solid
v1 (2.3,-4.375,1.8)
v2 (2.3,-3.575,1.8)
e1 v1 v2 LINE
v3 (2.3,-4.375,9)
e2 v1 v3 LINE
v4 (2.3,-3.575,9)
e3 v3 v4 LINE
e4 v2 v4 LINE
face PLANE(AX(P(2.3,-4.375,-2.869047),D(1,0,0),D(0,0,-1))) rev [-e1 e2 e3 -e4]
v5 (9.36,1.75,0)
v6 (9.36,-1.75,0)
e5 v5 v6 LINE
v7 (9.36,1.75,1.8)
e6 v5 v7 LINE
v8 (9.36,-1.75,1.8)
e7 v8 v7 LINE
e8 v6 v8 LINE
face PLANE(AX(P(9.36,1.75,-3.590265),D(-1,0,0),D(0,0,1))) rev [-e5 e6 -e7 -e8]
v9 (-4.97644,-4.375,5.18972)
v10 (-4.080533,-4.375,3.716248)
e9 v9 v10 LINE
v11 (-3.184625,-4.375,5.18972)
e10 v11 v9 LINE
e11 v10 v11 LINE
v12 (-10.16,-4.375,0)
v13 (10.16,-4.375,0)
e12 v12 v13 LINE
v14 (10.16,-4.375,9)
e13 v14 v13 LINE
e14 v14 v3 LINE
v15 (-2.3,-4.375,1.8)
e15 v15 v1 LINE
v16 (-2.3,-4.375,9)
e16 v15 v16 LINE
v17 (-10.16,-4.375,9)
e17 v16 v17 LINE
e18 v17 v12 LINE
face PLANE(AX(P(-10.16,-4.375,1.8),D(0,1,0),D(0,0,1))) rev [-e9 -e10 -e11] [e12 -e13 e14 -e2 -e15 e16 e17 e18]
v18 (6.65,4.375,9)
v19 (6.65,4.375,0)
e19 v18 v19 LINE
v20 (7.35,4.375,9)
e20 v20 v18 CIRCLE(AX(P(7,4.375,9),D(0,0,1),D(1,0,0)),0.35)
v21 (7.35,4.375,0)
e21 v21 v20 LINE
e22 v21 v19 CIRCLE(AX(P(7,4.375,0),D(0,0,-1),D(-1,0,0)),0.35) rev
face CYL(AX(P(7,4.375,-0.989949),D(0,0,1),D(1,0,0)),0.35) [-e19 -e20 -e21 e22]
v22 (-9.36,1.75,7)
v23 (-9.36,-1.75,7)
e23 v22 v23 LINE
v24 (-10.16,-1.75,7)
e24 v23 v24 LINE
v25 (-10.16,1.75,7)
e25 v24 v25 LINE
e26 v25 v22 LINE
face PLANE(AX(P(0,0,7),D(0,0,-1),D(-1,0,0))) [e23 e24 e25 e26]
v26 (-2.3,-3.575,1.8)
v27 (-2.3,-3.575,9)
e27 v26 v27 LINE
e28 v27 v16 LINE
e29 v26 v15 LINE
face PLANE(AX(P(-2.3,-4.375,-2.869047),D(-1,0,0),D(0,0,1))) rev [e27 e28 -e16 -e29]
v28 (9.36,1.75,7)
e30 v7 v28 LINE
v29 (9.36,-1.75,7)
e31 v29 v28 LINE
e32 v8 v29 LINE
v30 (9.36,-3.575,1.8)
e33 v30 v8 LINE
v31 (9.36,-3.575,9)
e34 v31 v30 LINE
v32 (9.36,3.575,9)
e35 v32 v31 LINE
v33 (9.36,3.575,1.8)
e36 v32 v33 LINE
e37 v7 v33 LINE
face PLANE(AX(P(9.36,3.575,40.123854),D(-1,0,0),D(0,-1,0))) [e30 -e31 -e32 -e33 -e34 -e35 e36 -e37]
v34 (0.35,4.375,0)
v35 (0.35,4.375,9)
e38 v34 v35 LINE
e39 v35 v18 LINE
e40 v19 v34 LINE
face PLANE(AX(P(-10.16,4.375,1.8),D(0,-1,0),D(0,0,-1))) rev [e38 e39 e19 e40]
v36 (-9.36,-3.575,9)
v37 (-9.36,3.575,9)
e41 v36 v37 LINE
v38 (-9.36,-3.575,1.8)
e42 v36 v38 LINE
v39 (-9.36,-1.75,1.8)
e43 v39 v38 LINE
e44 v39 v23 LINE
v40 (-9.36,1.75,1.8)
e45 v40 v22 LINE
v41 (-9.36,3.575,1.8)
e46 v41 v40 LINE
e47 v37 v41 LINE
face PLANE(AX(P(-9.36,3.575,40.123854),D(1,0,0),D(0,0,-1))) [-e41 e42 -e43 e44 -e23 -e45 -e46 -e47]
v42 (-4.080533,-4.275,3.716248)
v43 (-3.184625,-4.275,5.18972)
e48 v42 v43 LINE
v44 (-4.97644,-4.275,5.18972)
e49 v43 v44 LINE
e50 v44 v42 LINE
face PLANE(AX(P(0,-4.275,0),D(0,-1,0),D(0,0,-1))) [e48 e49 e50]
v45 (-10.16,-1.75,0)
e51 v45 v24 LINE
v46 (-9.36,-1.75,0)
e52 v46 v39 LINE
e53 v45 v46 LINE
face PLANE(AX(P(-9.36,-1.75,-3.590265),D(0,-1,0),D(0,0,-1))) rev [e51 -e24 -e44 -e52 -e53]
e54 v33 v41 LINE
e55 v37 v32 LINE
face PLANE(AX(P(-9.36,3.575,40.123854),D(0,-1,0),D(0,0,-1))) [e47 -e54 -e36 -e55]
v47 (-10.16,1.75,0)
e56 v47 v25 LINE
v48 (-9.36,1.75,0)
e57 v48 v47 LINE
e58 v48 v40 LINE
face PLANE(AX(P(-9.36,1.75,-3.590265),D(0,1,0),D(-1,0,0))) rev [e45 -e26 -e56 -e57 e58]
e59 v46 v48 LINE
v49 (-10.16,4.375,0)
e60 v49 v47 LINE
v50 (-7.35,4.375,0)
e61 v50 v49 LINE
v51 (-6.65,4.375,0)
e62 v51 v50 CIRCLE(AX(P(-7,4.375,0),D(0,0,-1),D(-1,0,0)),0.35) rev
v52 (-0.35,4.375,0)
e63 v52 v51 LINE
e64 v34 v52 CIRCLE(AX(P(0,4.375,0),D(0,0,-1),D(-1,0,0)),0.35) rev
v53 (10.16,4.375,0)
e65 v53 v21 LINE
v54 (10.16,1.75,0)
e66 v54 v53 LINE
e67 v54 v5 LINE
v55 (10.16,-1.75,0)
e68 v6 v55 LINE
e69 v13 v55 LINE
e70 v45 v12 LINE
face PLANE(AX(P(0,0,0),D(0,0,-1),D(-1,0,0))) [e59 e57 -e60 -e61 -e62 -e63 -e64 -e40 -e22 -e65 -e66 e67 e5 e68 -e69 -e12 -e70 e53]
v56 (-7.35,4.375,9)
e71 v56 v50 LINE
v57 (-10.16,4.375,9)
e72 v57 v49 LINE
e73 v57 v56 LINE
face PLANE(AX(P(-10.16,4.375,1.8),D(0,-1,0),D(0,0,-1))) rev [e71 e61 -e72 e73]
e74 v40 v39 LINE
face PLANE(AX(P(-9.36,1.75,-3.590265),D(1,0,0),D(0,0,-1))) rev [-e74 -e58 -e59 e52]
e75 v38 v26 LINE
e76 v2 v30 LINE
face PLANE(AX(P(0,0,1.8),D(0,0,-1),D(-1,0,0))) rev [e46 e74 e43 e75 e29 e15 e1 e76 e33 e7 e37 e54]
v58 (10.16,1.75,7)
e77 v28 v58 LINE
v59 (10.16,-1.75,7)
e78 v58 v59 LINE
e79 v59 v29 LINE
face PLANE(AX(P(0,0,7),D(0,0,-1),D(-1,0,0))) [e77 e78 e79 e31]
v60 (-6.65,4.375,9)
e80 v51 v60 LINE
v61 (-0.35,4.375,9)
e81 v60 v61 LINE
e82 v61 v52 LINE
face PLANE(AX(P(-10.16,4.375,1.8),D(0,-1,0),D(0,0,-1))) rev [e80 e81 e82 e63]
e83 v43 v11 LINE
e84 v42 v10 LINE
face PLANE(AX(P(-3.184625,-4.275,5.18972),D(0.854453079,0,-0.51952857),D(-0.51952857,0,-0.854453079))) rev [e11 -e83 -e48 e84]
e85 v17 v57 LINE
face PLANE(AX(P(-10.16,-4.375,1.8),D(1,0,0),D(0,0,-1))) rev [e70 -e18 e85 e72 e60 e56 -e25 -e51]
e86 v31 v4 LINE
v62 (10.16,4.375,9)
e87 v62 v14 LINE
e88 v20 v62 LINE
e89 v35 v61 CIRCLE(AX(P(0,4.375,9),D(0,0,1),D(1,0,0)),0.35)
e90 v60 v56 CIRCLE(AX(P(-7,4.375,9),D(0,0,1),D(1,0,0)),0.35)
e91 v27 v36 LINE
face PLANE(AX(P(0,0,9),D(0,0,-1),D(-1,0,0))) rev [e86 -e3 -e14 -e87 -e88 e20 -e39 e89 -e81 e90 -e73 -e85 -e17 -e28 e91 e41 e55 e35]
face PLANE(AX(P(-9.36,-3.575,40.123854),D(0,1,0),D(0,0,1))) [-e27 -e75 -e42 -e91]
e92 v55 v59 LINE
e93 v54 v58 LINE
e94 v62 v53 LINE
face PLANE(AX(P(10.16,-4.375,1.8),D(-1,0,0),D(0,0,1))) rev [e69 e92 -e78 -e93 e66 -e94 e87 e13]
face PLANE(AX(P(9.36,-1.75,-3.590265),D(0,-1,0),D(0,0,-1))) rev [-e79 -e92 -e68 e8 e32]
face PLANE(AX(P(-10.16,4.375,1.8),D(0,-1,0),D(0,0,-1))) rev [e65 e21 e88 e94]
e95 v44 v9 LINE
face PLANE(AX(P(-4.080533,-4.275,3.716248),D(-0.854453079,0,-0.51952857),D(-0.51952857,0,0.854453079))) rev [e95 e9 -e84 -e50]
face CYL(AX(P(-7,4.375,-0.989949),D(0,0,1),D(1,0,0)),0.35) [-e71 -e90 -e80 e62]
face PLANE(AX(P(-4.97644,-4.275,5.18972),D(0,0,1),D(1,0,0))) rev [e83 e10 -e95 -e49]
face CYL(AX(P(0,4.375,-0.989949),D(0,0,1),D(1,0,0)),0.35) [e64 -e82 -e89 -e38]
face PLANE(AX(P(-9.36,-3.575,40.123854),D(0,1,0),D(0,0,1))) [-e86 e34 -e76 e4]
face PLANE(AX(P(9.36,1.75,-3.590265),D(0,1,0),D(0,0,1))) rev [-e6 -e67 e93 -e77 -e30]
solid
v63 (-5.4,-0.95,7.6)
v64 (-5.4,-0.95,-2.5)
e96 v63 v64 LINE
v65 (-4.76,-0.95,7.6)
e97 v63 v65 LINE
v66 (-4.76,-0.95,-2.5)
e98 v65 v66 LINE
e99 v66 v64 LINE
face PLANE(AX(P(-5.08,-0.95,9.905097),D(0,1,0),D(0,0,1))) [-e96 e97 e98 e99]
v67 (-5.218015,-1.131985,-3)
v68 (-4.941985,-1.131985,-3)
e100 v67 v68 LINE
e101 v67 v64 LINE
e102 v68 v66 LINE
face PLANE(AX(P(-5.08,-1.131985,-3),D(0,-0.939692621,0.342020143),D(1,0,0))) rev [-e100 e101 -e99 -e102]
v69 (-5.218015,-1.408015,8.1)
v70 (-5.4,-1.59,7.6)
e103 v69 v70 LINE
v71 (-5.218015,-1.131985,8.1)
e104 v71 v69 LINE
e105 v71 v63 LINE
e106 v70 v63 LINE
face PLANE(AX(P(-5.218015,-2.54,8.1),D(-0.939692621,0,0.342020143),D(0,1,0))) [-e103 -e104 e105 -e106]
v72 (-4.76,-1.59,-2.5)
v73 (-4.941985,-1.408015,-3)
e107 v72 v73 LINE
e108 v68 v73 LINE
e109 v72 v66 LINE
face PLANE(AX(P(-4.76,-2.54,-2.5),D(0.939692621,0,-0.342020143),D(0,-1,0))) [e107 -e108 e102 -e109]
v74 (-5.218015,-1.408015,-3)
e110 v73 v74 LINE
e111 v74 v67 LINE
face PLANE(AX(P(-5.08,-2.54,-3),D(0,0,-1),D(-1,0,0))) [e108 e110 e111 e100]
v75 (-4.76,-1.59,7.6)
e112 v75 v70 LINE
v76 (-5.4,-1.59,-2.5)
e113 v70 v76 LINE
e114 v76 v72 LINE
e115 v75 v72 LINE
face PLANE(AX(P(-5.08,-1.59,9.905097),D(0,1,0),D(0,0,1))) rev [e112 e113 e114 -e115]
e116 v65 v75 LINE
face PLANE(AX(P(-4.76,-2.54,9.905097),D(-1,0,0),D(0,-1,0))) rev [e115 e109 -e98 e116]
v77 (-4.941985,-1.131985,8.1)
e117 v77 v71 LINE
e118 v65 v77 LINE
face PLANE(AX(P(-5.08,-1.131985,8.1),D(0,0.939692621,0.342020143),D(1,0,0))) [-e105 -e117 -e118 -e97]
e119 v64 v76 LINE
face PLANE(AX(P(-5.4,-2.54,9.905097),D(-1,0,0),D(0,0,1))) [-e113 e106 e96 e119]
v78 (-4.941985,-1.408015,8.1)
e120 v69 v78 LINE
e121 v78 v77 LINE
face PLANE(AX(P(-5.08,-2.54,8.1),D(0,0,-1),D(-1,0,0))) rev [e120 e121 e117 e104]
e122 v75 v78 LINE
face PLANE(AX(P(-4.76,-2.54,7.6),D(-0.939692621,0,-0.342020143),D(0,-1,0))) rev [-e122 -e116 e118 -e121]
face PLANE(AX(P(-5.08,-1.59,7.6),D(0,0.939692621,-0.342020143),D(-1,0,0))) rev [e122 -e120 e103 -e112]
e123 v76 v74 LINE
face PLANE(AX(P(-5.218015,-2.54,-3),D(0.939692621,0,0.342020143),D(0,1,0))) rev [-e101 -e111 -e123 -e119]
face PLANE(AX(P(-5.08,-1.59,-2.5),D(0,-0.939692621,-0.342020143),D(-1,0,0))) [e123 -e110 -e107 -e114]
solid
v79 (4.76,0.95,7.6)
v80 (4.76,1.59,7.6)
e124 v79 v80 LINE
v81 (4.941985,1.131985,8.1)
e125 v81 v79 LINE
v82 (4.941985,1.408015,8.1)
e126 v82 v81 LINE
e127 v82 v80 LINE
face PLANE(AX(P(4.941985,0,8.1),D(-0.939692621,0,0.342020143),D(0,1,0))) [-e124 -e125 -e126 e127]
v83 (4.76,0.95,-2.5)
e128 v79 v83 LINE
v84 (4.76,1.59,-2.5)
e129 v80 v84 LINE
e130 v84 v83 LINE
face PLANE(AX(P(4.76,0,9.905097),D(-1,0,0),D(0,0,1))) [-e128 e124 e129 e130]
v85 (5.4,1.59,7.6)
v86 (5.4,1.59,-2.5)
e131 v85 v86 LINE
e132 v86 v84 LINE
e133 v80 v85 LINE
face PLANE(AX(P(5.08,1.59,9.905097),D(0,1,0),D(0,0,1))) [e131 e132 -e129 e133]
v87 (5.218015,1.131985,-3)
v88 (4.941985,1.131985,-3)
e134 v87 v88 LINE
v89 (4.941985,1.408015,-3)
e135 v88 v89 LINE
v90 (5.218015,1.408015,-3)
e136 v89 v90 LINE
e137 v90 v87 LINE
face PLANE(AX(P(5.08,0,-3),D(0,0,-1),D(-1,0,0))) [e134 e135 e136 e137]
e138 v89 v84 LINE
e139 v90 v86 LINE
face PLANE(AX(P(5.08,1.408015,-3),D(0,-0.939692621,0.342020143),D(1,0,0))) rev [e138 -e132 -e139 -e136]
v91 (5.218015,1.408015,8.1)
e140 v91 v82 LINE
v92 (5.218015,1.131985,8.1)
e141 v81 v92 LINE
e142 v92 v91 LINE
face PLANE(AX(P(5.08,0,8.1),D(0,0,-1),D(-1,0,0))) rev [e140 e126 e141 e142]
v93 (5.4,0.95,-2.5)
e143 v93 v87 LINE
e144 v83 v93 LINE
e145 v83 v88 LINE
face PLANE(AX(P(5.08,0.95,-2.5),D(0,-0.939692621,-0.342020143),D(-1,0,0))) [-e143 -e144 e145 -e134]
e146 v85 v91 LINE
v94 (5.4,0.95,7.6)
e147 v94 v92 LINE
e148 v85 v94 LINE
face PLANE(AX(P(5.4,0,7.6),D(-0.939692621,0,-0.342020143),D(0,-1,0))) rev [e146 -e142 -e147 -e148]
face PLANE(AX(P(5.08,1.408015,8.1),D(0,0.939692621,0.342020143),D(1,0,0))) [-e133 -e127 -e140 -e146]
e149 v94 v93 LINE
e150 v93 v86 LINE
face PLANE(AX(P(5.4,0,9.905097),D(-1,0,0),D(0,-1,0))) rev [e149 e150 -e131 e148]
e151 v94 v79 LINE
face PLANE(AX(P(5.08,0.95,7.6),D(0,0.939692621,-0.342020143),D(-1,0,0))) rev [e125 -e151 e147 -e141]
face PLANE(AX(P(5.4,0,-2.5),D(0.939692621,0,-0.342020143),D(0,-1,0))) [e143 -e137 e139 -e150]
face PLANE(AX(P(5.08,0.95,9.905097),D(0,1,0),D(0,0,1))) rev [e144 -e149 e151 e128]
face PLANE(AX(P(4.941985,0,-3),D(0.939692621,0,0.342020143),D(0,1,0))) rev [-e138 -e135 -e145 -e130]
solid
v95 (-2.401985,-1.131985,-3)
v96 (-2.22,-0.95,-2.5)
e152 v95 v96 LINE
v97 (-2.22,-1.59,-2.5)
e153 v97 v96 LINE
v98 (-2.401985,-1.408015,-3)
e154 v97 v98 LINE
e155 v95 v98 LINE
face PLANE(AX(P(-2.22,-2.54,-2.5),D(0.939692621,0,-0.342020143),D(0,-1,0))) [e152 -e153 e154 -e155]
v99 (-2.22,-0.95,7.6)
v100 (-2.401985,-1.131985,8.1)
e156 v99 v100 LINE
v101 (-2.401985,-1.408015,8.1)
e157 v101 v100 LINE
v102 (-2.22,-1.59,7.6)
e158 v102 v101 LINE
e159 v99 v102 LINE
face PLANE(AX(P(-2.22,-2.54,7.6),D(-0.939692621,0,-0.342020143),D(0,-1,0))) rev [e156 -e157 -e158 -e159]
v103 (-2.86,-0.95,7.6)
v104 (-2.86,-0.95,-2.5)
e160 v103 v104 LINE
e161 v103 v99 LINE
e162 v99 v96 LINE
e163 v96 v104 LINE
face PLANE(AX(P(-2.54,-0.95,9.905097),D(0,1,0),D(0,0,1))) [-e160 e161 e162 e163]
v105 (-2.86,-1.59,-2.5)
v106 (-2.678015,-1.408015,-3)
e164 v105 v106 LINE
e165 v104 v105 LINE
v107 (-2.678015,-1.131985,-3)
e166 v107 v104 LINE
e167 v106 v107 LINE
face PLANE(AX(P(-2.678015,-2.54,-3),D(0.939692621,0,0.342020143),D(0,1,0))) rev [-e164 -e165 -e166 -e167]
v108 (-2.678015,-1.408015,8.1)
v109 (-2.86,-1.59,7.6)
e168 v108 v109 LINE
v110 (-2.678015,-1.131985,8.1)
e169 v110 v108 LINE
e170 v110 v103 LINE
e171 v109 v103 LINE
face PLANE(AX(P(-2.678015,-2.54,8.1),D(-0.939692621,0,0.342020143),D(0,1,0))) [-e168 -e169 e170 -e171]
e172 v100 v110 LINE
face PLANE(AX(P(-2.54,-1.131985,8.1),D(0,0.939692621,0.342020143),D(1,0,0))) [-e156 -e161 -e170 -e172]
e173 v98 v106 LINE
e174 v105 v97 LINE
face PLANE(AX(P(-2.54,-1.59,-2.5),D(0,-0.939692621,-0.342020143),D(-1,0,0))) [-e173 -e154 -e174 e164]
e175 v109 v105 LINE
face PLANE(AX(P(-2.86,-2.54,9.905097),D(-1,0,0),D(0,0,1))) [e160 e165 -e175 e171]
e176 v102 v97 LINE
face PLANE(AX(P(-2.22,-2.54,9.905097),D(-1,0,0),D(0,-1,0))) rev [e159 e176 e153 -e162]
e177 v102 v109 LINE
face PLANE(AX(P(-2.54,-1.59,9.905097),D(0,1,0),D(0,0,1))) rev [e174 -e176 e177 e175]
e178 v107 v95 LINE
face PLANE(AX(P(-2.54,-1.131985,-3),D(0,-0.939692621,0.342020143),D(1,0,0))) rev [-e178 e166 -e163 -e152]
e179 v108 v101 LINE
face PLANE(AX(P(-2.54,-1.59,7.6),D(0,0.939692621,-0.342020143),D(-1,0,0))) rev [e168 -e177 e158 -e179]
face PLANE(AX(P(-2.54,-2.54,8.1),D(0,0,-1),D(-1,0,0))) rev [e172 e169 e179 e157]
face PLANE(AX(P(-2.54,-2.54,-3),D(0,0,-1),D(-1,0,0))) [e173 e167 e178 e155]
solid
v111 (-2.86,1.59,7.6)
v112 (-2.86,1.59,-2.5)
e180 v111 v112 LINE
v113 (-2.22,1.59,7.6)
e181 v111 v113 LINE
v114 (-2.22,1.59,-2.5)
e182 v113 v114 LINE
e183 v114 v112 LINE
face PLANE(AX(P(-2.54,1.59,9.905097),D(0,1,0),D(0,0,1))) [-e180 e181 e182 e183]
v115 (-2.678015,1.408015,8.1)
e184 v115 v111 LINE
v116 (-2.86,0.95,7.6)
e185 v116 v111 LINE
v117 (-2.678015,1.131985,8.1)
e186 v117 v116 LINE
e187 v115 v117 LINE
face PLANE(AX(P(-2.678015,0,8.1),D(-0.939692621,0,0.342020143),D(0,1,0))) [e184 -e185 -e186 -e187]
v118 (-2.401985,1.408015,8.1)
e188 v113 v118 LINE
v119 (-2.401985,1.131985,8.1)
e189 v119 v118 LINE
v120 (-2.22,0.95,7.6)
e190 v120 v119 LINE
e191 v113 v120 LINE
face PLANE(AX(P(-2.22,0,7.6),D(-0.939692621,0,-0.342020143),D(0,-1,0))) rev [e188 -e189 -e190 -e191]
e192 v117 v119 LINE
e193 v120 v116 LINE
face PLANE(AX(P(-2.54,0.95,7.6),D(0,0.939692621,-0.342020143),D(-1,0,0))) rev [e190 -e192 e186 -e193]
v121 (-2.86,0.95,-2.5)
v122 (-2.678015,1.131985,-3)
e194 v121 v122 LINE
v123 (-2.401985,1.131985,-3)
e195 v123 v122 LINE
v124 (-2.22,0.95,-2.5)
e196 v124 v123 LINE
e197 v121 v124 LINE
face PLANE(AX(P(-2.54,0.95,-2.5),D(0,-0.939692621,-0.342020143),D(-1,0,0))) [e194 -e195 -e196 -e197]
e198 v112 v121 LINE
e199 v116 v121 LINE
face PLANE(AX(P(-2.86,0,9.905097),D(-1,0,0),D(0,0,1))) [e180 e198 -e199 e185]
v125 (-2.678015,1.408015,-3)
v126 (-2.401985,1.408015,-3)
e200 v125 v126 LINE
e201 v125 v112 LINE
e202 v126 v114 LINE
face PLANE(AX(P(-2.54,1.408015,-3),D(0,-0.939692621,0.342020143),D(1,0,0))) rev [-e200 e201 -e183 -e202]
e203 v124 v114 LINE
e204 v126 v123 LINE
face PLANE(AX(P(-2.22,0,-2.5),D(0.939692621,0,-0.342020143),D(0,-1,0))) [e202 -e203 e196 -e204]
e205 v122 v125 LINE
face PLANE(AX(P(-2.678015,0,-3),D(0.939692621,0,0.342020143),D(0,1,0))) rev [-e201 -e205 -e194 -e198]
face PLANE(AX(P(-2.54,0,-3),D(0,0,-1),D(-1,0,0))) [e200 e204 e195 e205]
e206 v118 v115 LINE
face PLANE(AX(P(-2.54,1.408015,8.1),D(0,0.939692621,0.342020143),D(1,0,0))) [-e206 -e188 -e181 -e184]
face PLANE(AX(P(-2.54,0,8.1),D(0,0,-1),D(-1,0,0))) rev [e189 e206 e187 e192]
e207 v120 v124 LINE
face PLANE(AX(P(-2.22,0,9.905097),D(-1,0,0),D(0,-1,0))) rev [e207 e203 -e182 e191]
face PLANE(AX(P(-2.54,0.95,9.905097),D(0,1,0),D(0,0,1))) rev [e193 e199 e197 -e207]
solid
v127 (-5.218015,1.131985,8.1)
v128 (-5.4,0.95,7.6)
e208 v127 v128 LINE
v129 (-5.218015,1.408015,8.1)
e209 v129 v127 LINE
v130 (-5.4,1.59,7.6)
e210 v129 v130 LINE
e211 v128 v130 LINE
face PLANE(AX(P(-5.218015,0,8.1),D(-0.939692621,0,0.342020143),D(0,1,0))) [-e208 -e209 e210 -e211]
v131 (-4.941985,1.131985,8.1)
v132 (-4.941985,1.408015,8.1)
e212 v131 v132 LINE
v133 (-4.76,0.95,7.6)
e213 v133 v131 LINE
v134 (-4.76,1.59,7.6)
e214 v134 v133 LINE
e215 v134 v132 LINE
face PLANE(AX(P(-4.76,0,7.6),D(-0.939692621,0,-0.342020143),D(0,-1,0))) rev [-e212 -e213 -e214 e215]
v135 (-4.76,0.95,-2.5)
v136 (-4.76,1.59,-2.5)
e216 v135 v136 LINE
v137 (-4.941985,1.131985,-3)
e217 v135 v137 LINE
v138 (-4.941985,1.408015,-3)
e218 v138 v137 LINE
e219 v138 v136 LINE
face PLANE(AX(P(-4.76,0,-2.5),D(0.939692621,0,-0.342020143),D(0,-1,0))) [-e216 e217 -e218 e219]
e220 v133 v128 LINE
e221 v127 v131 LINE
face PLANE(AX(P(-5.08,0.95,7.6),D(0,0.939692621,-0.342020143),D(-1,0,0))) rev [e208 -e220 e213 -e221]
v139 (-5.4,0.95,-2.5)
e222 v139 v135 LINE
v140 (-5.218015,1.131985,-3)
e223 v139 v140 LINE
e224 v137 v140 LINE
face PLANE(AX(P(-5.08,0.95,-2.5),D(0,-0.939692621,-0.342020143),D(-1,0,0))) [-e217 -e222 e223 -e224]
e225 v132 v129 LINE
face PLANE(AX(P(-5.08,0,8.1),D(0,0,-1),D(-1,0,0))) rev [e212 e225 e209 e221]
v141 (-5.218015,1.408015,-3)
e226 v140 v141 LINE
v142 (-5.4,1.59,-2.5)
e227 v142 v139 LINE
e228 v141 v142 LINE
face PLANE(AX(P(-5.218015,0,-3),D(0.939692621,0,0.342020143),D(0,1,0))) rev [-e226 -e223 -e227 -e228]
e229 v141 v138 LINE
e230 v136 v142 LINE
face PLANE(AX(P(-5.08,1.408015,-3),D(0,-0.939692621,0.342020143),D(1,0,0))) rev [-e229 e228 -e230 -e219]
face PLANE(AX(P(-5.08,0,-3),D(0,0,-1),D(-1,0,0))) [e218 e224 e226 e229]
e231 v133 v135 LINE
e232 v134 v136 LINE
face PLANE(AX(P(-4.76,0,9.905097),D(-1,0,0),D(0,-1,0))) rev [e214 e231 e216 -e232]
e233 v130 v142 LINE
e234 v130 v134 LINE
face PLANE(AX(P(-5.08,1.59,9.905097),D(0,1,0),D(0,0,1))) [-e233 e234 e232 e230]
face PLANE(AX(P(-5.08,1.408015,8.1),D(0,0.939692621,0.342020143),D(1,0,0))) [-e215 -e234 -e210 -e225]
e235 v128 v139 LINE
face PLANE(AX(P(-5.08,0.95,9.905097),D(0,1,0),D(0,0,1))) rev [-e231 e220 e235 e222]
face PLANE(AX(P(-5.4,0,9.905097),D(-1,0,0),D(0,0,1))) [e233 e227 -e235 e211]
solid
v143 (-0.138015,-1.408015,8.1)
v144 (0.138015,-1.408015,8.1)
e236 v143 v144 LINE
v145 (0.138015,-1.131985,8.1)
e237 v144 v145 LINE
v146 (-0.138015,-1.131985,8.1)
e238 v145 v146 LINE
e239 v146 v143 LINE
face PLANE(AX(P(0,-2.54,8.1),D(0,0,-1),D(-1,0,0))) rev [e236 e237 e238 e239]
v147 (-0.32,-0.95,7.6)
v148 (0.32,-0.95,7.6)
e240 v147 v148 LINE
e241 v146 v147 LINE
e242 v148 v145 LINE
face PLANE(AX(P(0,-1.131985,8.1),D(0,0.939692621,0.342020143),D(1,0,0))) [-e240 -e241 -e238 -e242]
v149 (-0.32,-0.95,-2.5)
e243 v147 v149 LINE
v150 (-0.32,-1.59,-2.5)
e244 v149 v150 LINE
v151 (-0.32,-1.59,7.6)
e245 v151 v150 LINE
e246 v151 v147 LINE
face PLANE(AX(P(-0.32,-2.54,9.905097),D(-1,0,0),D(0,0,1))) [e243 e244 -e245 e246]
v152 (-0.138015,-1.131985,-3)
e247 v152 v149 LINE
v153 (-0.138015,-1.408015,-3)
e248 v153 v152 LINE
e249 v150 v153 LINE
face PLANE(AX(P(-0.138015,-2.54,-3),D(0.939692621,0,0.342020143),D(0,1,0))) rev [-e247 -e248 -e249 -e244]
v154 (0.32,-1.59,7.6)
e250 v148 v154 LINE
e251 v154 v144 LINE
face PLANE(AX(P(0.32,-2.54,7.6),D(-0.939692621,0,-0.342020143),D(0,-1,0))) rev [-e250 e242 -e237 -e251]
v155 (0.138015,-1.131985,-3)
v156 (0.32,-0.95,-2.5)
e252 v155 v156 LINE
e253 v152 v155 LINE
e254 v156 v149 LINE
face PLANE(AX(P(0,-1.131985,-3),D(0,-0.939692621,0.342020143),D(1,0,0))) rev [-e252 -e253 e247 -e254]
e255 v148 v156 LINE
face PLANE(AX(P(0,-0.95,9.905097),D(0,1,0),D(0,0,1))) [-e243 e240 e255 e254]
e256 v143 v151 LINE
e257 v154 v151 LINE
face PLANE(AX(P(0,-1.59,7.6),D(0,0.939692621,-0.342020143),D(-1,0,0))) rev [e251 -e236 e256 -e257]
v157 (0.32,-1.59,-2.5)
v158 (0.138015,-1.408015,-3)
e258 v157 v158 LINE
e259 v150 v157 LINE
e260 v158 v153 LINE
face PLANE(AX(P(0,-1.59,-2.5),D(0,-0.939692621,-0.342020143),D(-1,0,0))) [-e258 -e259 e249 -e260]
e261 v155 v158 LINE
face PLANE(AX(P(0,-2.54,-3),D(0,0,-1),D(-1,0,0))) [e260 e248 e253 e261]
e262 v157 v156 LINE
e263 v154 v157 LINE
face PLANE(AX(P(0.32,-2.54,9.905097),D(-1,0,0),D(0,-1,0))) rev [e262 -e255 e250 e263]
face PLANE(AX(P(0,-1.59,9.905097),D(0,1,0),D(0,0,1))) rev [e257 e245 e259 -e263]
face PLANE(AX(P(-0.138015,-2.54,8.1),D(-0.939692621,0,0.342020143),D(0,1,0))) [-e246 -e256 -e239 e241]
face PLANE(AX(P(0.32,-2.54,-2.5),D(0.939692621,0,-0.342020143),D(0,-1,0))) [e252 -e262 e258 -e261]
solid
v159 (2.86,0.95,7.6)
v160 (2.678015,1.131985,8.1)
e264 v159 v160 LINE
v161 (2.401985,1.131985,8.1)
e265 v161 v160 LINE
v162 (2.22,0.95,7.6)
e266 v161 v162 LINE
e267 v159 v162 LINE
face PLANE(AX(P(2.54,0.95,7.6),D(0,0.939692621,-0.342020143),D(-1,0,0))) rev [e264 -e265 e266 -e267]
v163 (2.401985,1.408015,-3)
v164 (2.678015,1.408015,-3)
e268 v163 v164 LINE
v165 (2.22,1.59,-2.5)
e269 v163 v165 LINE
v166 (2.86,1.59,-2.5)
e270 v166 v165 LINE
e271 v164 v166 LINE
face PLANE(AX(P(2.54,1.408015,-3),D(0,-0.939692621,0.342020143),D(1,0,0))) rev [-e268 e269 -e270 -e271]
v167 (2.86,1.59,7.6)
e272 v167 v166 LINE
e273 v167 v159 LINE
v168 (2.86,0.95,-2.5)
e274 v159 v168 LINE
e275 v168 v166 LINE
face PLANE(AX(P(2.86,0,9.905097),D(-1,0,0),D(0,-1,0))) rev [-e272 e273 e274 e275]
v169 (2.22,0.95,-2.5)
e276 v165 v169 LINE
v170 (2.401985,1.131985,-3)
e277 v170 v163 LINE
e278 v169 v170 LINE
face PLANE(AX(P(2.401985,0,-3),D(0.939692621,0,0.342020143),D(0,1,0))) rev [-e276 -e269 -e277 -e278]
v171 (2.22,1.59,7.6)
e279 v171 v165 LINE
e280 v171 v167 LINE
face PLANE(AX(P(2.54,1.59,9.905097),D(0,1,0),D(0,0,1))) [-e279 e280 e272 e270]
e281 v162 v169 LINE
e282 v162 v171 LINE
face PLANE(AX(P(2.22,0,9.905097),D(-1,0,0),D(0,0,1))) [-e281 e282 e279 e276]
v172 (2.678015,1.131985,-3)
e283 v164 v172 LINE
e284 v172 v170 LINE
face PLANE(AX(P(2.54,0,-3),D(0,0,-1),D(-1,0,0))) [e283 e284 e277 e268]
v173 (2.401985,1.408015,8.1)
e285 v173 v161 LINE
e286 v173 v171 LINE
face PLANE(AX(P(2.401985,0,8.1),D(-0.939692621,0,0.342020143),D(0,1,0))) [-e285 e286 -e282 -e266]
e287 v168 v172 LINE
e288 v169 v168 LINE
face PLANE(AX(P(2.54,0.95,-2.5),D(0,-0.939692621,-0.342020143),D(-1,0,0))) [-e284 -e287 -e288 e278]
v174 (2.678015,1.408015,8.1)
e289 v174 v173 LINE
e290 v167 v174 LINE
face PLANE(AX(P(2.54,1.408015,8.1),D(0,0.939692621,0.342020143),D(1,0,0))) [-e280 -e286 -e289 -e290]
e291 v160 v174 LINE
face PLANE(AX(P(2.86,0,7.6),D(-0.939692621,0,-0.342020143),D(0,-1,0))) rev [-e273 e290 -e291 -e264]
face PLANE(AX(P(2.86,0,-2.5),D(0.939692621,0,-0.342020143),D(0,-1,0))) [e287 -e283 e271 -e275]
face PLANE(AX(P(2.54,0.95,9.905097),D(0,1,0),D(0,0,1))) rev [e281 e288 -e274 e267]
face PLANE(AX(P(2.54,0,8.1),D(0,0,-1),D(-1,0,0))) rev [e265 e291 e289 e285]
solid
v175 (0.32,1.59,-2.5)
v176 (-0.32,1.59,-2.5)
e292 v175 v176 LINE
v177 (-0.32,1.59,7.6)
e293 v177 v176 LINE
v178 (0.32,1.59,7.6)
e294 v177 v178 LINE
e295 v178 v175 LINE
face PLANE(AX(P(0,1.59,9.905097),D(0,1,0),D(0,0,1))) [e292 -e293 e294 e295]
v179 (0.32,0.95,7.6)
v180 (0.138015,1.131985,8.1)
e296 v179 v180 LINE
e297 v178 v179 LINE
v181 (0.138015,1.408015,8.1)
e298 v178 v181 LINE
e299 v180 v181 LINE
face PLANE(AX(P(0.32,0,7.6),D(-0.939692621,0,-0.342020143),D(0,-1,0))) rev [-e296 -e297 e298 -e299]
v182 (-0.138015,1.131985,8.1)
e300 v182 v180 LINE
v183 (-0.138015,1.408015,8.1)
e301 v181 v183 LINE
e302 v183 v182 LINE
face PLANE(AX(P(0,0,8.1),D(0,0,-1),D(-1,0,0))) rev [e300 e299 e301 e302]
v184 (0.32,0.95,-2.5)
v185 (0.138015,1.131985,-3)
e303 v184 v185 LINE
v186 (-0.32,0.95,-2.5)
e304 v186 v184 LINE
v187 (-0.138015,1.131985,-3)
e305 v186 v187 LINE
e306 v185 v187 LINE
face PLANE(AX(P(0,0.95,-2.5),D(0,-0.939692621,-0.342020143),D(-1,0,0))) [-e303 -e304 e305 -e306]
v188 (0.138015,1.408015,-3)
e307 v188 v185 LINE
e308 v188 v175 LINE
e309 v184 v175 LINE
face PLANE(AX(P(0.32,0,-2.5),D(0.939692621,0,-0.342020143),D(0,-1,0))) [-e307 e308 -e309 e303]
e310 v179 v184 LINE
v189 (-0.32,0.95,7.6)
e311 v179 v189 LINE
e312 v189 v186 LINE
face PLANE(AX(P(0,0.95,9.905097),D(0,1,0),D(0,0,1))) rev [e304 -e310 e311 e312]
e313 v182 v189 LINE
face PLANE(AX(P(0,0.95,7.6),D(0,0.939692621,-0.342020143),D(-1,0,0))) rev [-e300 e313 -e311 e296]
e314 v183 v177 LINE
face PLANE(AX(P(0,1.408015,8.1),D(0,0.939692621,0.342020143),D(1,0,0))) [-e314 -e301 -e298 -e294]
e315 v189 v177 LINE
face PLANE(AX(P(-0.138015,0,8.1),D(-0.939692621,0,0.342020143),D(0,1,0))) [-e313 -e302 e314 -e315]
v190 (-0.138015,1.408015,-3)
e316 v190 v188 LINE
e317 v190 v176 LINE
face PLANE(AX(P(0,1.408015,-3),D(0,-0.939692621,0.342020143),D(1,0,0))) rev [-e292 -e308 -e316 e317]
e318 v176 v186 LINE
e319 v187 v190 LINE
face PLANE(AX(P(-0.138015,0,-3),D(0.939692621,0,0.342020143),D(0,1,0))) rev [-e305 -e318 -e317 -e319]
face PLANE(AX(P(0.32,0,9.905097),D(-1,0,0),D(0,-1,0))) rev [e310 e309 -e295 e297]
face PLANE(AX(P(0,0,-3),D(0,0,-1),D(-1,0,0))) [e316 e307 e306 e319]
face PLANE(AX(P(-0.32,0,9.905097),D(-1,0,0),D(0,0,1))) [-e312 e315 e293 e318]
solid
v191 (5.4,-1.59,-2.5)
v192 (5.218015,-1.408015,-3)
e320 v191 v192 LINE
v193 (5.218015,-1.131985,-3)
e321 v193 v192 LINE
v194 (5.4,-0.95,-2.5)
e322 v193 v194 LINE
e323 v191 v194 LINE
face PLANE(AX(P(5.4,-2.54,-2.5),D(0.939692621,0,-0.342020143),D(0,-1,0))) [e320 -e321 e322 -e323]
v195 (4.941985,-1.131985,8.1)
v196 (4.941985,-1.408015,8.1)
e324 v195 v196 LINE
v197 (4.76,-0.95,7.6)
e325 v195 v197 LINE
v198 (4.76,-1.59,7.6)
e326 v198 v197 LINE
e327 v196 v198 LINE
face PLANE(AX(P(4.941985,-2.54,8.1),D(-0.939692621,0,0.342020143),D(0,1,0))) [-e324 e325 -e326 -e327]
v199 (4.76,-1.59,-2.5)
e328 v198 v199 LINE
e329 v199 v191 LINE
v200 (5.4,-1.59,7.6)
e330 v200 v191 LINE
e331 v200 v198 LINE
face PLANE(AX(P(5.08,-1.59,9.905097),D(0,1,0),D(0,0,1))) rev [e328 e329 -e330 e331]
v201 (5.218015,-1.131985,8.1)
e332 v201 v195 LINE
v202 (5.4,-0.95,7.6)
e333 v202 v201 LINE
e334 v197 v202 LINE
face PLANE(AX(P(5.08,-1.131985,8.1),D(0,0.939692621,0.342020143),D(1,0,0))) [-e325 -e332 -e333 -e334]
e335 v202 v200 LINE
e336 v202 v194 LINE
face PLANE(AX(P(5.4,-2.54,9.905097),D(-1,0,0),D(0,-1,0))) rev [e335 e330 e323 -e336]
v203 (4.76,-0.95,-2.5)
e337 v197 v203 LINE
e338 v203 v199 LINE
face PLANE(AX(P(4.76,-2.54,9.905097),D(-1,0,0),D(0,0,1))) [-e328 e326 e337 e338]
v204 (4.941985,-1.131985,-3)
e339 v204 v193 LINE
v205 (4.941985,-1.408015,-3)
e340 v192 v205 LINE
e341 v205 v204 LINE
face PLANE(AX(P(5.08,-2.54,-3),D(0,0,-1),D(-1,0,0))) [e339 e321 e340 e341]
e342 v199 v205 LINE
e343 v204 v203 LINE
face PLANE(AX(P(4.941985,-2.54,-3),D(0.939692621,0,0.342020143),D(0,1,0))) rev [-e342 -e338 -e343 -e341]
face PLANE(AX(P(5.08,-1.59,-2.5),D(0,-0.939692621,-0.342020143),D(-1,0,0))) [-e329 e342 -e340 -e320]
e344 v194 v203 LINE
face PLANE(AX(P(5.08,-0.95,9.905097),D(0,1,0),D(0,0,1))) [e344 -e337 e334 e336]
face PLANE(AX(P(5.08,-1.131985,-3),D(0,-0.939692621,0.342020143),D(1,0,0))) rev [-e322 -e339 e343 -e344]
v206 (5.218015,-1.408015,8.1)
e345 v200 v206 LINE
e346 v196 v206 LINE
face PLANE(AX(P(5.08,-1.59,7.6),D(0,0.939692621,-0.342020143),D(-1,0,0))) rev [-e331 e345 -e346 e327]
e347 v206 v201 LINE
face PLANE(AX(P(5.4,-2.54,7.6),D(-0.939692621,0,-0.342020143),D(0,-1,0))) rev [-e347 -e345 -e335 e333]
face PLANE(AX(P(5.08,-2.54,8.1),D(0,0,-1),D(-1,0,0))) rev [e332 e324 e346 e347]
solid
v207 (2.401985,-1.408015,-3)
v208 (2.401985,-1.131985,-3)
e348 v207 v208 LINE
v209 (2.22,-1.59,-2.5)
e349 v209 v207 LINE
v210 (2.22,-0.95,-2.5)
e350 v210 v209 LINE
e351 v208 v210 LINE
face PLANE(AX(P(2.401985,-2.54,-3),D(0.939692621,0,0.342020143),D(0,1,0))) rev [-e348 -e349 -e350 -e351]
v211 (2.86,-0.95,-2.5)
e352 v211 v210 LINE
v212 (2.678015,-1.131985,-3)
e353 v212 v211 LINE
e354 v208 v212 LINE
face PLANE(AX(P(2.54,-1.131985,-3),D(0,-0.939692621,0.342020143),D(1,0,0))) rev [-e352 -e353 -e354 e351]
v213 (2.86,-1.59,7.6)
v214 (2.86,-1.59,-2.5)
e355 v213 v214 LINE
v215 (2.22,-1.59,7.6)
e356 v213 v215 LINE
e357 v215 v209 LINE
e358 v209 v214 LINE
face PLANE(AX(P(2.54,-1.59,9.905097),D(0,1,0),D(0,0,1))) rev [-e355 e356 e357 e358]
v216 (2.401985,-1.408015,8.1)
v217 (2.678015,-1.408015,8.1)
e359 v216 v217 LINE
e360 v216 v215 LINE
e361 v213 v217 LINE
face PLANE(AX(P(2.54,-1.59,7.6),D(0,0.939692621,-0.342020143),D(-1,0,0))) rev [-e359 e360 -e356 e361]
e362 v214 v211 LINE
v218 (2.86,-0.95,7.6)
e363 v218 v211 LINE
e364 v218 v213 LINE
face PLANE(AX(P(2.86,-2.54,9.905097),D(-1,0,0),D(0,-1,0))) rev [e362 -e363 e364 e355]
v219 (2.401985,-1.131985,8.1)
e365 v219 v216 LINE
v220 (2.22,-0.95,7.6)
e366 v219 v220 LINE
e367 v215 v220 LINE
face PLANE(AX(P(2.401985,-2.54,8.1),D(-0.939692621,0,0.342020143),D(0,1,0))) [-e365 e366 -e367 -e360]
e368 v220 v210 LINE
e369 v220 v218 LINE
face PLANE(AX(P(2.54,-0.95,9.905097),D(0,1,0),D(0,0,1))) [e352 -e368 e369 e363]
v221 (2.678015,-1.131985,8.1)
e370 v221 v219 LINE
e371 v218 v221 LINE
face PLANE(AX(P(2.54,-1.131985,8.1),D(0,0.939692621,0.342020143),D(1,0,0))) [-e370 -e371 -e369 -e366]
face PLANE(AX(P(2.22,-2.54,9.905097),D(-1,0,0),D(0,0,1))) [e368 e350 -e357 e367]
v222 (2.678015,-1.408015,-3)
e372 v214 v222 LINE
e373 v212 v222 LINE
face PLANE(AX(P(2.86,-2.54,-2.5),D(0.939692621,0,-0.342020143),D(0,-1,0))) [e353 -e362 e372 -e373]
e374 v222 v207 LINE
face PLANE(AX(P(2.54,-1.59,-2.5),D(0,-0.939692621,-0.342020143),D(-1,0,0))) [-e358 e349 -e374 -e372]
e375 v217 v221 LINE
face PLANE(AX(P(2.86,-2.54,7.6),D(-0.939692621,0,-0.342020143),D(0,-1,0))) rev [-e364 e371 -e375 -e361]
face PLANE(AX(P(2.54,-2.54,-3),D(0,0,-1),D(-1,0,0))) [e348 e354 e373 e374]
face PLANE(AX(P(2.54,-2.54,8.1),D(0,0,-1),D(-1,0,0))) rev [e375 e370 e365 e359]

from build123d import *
from OCP.BRepFilletAPI import BRepFilletAPI_MakeChamfer

# Parameters (mm, degrees)
SKETCH_1_W               = 20.32
SKETCH_1_H               = 8.75
EXTRUDE_1_DEPTH          = 1.8
SKETCH_2_W               = 20.32
SKETCH_2_H               = 8.75
SKETCH_2_W_2             = 18.72
SKETCH_2_H_2             = 7.15
EXTRUDE_2_DEPTH          = 7.2
CUT_EXTRUDE_START        = -1.8
SKETCH_3_W               = 0.8
SKETCH_3_H               = 3.5
CUT_EXTRUDE_1_DEPTH      = 7
SKETCH_4_W               = 4.6
SKETCH_4_H               = 0.8
CUT_EXTRUDE_2_DEPTH      = 7.2
EXTRUDE_3_DEPTH          = 6.3
EXTRUDE_3_DEPTH_BACK     = 4.8
SKETCH_5_W               = 0.64
SKETCH_5_H               = 0.64
CHAMFER_2_SIZE           = 0.5
CHAMFER_2_SIZE2          = 0.181985117
CHAMFER_8_SIZE           = 0.5
CHAMFER_8_SIZE2          = 0.181985117
CUT_EXTRUDE_3_DEPTH      = 0.1
PATTERN_LINEAR_1_COUNT   = 3
PATTERN_LINEAR_1_PITCH   = 2.54
PATTERN_LINEAR_1_2_COUNT = 2
PATTERN_LINEAR_1_2_PITCH = 2.54
SKETCH_7_R               = 0.35
EXTRUDE_4_DEPTH          = 9


with BuildPart() as part:
    # Эскиз1 → Бобышка-Вытянуть1 (new body)
    with BuildSketch(Plane.XY):
        Rectangle(SKETCH_1_W, SKETCH_1_H)
    extrude(amount=EXTRUDE_1_DEPTH)

    # Эскиз2 → Бобышка-Вытянуть2 (add)
    with BuildSketch(Plane.XY.offset(1.8)):
        Rectangle(SKETCH_2_W, SKETCH_2_H)
        Rectangle(SKETCH_2_W_2, SKETCH_2_H_2, mode=Mode.SUBTRACT)
    extrude(amount=EXTRUDE_2_DEPTH)

    # Эскиз3 → Вырез-Вытянуть1 (cut)
    with BuildSketch(Plane.XY.offset(1.8).offset(CUT_EXTRUDE_START)):
        with Locations((9.76, 0)):
            Rectangle(SKETCH_3_W, SKETCH_3_H)
        with Locations((-9.76, 0)):
            Rectangle(SKETCH_3_W, SKETCH_3_H)
    extrude(amount=CUT_EXTRUDE_1_DEPTH, mode=Mode.SUBTRACT)

    # Эскиз4 → Вырез-Вытянуть2 (cut)
    with BuildSketch(Plane.XY.offset(9)):
        with Locations((0, -3.975)):
            Rectangle(SKETCH_4_W, SKETCH_4_H)
    extrude(amount=-CUT_EXTRUDE_2_DEPTH, mode=Mode.SUBTRACT)

    # Эскиз6 → Вырез-Вытянуть3 (cut)
    with BuildSketch(Plane.XZ.offset(4.375)):
        Polygon((-4.976440372, 5.189720174), (-3.184624847, 5.189720174), (-4.08053261, 3.716247509), align=None)
    extrude(amount=-CUT_EXTRUDE_3_DEPTH, mode=Mode.SUBTRACT)

    # Эскиз7 → Бобышка-Вытянуть4 (add)
    with BuildSketch(Plane.XY.offset(9)):
        with Locations((0, 4.375)):
            Circle(SKETCH_7_R)
        with Locations((7, 4.375)):
            Circle(SKETCH_7_R)
        with Locations((-7, 4.375)):
            Circle(SKETCH_7_R)
    extrude(amount=-EXTRUDE_4_DEPTH)


with BuildPart() as body_2:
    # Эскиз5 → Бобышка-Вытянуть3 (new, two sides: drawn at the far end of the back side and taken through both)
    with BuildSketch(Plane.XY.offset(1.8).offset(-EXTRUDE_3_DEPTH_BACK)):
        with Locations((0, 1.27)):
            Rectangle(SKETCH_5_W, SKETCH_5_H)
    extrude(amount=EXTRUDE_3_DEPTH + EXTRUDE_3_DEPTH_BACK)

    # Фаска2: one chamfer whose edges measure the first distance from different faces: ONE call of the kernel's chamfer builder (chamfer() names one face for all edges)
    chamfer_2_edges_1 = [body_2.edges().sort_by_distance(p)[0] for p in [
        (-0.32, 1.27, -3),
    ]]
    chamfer_2_side_1 = [body_2.faces().sort_by_distance(p)[0] for p in [
        (-0.32, 1.27, 2.55),
    ]]
    chamfer_2_edges_2 = [body_2.edges().sort_by_distance(p)[0] for p in [
        (0, 1.59, -3),
    ]]
    chamfer_2_side_2 = [body_2.faces().sort_by_distance(p)[0] for p in [
        (0, 1.59, 2.55),
    ]]
    chamfer_2_edges_3 = [body_2.edges().sort_by_distance(p)[0] for p in [
        (0.32, 1.27, -3),
    ]]
    chamfer_2_side_3 = [body_2.faces().sort_by_distance(p)[0] for p in [
        (0.32, 1.27, 2.55),
    ]]
    chamfer_2_edges_4 = [body_2.edges().sort_by_distance(p)[0] for p in [
        (0, 0.95, -3),
    ]]
    chamfer_2_side_4 = [body_2.faces().sort_by_distance(p)[0] for p in [
        (0, 0.95, 2.55),
    ]]
    chamfer_2 = BRepFilletAPI_MakeChamfer(body_2.part.solid().wrapped)
    for e in chamfer_2_edges_1:
        chamfer_2.Add(CHAMFER_2_SIZE, CHAMFER_2_SIZE2, e.wrapped, chamfer_2_side_1[0].wrapped)  # the first distance lies on this face
    for e in chamfer_2_edges_2:
        chamfer_2.Add(CHAMFER_2_SIZE, CHAMFER_2_SIZE2, e.wrapped, chamfer_2_side_2[0].wrapped)  # the first distance lies on this face
    for e in chamfer_2_edges_3:
        chamfer_2.Add(CHAMFER_2_SIZE, CHAMFER_2_SIZE2, e.wrapped, chamfer_2_side_3[0].wrapped)  # the first distance lies on this face
    for e in chamfer_2_edges_4:
        chamfer_2.Add(CHAMFER_2_SIZE, CHAMFER_2_SIZE2, e.wrapped, chamfer_2_side_4[0].wrapped)  # the first distance lies on this face
    add(Compound.cast(chamfer_2.Shape()), mode=Mode.REPLACE)

    # Фаска8: one chamfer whose edges measure the first distance from different faces: ONE call of the kernel's chamfer builder (chamfer() names one face for all edges)
    chamfer_8_edges_1 = [body_2.edges().sort_by_distance(p)[0] for p in [
        (0, 1.59, 8.1),
    ]]
    chamfer_8_side_1 = [body_2.faces().sort_by_distance(p)[0] for p in [
        (0, 1.59, 2.8),
    ]]
    chamfer_8_edges_2 = [body_2.edges().sort_by_distance(p)[0] for p in [
        (0.32, 1.27, 8.1),
    ]]
    chamfer_8_side_2 = [body_2.faces().sort_by_distance(p)[0] for p in [
        (0.32, 1.27, 2.8),
    ]]
    chamfer_8_edges_3 = [body_2.edges().sort_by_distance(p)[0] for p in [
        (0, 0.95, 8.1),
    ]]
    chamfer_8_side_3 = [body_2.faces().sort_by_distance(p)[0] for p in [
        (0, 0.95, 2.8),
    ]]
    chamfer_8_edges_4 = [body_2.edges().sort_by_distance(p)[0] for p in [
        (-0.32, 1.27, 8.1),
    ]]
    chamfer_8_side_4 = [body_2.faces().sort_by_distance(p)[0] for p in [
        (-0.32, 1.27, 2.8),
    ]]
    chamfer_8 = BRepFilletAPI_MakeChamfer(body_2.part.solid().wrapped)
    for e in chamfer_8_edges_1:
        chamfer_8.Add(CHAMFER_8_SIZE, CHAMFER_8_SIZE2, e.wrapped, chamfer_8_side_1[0].wrapped)  # the first distance lies on this face
    for e in chamfer_8_edges_2:
        chamfer_8.Add(CHAMFER_8_SIZE, CHAMFER_8_SIZE2, e.wrapped, chamfer_8_side_2[0].wrapped)  # the first distance lies on this face
    for e in chamfer_8_edges_3:
        chamfer_8.Add(CHAMFER_8_SIZE, CHAMFER_8_SIZE2, e.wrapped, chamfer_8_side_3[0].wrapped)  # the first distance lies on this face
    for e in chamfer_8_edges_4:
        chamfer_8.Add(CHAMFER_8_SIZE, CHAMFER_8_SIZE2, e.wrapped, chamfer_8_side_4[0].wrapped)  # the first distance lies on this face
    add(Compound.cast(chamfer_8.Shape()), mode=Mode.REPLACE)


with BuildPart() as pattern_linear_1_1:
    # Линейный массив1: pattern copy
    add(body_2.part.moved(Location(Vector(-1, 0, 0) * (1 * PATTERN_LINEAR_1_PITCH))))


with BuildPart() as pattern_linear_1_2:
    # Линейный массив1: pattern copy
    add(body_2.part.moved(Location(Vector(-1, 0, 0) * (2 * PATTERN_LINEAR_1_PITCH))))


with BuildPart() as pattern_linear_1_2_1:
    # Pattern Linear 1 2: pattern copy
    add(body_2.part.moved(Location(Vector(0, -1, 0) * (1 * PATTERN_LINEAR_1_2_PITCH))))


with BuildPart() as pattern_linear_1_2_2:
    # Pattern Linear 1 2: pattern copy
    add(pattern_linear_1_1.part.moved(Location(Vector(0, -1, 0) * (1 * PATTERN_LINEAR_1_2_PITCH))))


with BuildPart() as pattern_linear_1_2_3:
    # Pattern Linear 1 2: pattern copy
    add(pattern_linear_1_2.part.moved(Location(Vector(0, -1, 0) * (1 * PATTERN_LINEAR_1_2_PITCH))))


with BuildPart() as body_8:
    # Линейный массив2: read off the stored shape, not the designer's step
    # Линейный массив2: copy of Линейный массив1 2_3
    add(pattern_linear_1_2_3.part.moved(Location((10.16, 0, 0))))


with BuildPart() as body_9:
    # Pattern Linear 2 2: copy of Линейный массив1 2_3
    add(pattern_linear_1_2_3.part.moved(Location((7.62, 0, 0))))


with BuildPart() as body_10:
    # Pattern Linear 2 3: copy of Линейный массив1 2_3
    add(pattern_linear_1_2_3.part.moved(Location((10.16, 2.54, 0))))


with BuildPart() as body_11:
    # Pattern Linear 2 4: copy of Линейный массив1 2_3
    add(pattern_linear_1_2_3.part.moved(Location((7.62, 2.54, 0))))


solid = Compound([part.part, body_2.part, pattern_linear_1_1.part, pattern_linear_1_2.part, pattern_linear_1_2_1.part, pattern_linear_1_2_2.part, pattern_linear_1_2_3.part, body_8.part, body_9.part, body_10.part, body_11.part])
